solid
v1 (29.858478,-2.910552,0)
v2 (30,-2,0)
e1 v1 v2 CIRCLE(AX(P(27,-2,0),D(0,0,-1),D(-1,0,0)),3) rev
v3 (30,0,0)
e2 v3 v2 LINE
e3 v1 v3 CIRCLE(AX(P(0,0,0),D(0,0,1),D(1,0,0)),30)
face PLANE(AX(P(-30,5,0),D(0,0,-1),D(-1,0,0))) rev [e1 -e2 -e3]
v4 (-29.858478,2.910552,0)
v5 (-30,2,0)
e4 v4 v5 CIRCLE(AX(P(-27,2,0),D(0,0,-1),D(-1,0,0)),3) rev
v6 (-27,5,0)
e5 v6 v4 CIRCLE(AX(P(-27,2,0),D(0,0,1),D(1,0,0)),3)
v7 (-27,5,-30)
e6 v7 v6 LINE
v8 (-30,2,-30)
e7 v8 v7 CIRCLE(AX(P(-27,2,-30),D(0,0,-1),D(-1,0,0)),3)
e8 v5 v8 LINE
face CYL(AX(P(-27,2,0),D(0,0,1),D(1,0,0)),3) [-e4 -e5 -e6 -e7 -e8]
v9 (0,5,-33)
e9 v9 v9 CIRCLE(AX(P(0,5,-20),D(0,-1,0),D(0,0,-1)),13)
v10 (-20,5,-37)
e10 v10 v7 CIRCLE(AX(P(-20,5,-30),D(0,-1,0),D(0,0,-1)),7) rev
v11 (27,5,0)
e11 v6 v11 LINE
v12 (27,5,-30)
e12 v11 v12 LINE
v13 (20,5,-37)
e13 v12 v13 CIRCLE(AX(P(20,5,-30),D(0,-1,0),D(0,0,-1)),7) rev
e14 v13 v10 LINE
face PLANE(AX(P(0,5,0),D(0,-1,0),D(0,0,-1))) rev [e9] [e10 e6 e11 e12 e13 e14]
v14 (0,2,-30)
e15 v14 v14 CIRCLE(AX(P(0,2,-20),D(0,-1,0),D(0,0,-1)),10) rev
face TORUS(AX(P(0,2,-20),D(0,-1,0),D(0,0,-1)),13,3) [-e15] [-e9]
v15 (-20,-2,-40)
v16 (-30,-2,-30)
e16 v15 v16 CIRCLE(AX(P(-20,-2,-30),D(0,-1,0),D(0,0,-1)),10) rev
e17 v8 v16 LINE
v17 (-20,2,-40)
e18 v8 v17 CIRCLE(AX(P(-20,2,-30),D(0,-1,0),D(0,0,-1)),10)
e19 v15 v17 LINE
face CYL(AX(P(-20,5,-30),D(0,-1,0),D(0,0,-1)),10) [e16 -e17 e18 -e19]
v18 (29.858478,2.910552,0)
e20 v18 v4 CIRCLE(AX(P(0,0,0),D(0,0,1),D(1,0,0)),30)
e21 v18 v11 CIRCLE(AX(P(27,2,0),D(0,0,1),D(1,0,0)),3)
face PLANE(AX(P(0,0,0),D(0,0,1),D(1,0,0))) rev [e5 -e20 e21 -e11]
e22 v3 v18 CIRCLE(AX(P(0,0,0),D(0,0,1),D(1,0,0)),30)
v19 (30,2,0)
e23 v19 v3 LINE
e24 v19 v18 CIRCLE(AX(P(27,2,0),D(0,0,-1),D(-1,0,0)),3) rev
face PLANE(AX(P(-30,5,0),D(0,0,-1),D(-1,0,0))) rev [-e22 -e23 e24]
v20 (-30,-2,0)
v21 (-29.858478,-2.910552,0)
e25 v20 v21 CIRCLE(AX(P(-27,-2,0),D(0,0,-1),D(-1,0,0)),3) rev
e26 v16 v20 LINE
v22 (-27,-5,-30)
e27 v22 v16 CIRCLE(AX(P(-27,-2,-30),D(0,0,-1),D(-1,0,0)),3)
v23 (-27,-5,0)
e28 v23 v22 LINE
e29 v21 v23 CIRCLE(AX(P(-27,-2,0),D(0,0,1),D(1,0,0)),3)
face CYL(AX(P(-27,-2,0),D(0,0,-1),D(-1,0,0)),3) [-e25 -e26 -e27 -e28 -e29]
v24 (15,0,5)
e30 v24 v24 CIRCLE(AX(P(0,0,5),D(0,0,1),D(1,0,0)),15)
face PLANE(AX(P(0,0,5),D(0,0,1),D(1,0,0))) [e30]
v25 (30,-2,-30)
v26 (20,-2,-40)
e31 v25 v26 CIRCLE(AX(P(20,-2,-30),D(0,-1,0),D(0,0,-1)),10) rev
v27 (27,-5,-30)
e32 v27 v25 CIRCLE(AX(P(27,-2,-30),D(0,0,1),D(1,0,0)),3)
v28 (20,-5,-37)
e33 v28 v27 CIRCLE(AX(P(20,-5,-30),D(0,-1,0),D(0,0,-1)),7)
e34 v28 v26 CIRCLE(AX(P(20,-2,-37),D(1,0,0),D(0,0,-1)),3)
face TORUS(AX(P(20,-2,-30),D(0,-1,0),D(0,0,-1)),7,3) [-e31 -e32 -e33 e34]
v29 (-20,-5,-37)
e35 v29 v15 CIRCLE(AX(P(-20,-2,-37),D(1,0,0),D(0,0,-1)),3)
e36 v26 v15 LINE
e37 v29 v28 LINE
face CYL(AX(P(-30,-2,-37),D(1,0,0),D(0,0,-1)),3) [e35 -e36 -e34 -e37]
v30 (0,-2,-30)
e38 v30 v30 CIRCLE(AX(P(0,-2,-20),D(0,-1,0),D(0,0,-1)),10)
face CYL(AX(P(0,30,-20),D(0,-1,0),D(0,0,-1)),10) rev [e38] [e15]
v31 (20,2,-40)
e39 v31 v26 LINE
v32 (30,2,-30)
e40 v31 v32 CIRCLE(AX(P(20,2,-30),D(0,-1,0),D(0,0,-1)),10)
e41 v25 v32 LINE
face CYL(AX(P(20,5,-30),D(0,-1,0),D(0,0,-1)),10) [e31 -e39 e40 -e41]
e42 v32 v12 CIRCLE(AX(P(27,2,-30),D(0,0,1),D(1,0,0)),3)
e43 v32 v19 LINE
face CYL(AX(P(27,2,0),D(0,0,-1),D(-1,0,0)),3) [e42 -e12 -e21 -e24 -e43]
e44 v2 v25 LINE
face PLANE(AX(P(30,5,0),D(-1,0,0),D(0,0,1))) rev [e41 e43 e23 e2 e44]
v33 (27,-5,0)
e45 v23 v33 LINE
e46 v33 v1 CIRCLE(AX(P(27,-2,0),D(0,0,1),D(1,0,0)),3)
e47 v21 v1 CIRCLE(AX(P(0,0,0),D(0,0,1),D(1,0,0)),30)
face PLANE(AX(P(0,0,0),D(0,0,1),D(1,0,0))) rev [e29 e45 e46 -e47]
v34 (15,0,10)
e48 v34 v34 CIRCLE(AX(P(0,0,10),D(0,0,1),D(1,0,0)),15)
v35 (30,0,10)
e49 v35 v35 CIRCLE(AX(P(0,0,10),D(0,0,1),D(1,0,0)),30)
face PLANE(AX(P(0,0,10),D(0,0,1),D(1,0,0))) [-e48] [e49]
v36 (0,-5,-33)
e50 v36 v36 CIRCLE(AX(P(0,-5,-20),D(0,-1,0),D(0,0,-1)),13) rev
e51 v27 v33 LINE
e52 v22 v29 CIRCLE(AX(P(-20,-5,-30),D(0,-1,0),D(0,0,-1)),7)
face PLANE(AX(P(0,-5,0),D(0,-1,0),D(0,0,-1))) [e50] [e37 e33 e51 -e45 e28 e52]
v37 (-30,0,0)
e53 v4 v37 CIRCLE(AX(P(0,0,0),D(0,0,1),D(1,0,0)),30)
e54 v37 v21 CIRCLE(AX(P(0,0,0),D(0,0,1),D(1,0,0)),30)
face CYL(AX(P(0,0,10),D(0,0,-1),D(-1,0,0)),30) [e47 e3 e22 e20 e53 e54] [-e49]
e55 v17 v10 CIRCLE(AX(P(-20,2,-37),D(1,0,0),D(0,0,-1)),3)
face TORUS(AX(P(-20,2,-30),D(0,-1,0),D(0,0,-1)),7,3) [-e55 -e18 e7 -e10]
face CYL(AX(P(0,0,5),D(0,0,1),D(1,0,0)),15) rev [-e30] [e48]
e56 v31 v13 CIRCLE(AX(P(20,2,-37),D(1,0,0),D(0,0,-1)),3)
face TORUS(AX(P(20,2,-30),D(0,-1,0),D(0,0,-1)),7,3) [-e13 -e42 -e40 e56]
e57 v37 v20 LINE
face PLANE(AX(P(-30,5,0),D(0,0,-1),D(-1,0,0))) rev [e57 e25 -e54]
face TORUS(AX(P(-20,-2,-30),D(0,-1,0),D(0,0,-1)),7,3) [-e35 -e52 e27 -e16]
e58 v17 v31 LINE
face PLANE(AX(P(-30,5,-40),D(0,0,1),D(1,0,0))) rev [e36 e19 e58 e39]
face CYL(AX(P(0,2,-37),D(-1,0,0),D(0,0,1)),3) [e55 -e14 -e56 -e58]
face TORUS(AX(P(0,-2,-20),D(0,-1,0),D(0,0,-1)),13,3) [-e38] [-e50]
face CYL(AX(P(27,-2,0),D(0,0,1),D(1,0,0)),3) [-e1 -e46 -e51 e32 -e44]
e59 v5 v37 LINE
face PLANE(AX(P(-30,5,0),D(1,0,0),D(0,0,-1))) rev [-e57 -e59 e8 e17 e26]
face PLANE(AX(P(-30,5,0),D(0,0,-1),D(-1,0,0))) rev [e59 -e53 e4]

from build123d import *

# Parameters (mm, degrees)
CROQUIS1_R              = 30
SALIENTE_EXTRUIR1_DEPTH = 10
CROQUIS2_W              = 60
CROQUIS2_H              = 40
SALIENTE_EXTRUIR2_DEPTH = 5
REDONDEO1_R             = 10
REDONDEO2_R             = 3
CROQUIS3_R              = 15
CORTAR_EXTRUIR1_DEPTH   = 5
CROQUIS4_R              = 10
CORTAR_EXTRUIR2_DEPTH   = 62.032778128
REDONDEO3_R             = 3


with BuildPart() as part:
    # Croquis1 → Saliente-Extruir1 (new body)
    with BuildSketch(Plane.XY):
        Circle(CROQUIS1_R)
    extrude(amount=SALIENTE_EXTRUIR1_DEPTH)

    # Croquis2 → Saliente-Extruir2 (add, symmetric)
    with BuildSketch(Plane(origin=(0, 0, 0), x_dir=(1, 0, 0), z_dir=(0, 1, 0))):
        with Locations((0, 20)):
            Rectangle(CROQUIS2_W, CROQUIS2_H)
    extrude(amount=SALIENTE_EXTRUIR2_DEPTH, both=True)

    # Redondeo1
    redondeo1_edges = [part.edges().sort_by_distance(p)[0] for p in [
        (-30, 0, -40),
        (30, 0, -40),
    ]]
    fillet(redondeo1_edges, radius=REDONDEO1_R)

    # Redondeo2
    # the kernel refuses this fillet: 3 mm, written as the material it takes off along each edge
    with BuildSketch(Plane(origin=(30, -5, 0), x_dir=(0, 1, 0), z_dir=(0, 0, -1)), Plane(origin=(30, 5, 0), x_dir=(-1, 0, 0), z_dir=(0, 0, -1)), Plane(origin=(-30, -5, -30), x_dir=(0, 1, 0), z_dir=(0, 0, 1)), Plane(origin=(-30, 5, -30), x_dir=(1, 0, 0), z_dir=(0, 0, 1))) as redondeo2_piece_1:
        with BuildLine():
            CenterArc((REDONDEO2_R, -REDONDEO2_R), REDONDEO2_R, 90, 90)
            Line((0, -REDONDEO2_R), (0, 0))
            Line((0, 0), (REDONDEO2_R, 0))
        make_face()
    extrude(amount=30, mode=Mode.SUBTRACT)
    with BuildSketch(Plane(origin=(20, -5, -40), x_dir=(0, 1, 0), z_dir=(-1, 0, 0)), Plane(origin=(20, 5, -40), x_dir=(0, 0, 1), z_dir=(-1, 0, 0))) as redondeo2_piece_2:
        with BuildLine():
            CenterArc((REDONDEO2_R, -REDONDEO2_R), REDONDEO2_R, 90, 90)
            Line((0, -REDONDEO2_R), (0, 0))
            Line((0, 0), (REDONDEO2_R, 0))
        make_face()
    extrude(amount=40, mode=Mode.SUBTRACT)
    with BuildSketch(Plane(origin=(-20, -5, -30), x_dir=(-1, 0, 0), z_dir=(0, 0, 1))) as redondeo2_piece_3:
        with BuildLine():
            CenterArc((10 - REDONDEO2_R, -REDONDEO2_R), REDONDEO2_R, 0, 90)
            Line((10 - REDONDEO2_R, 0), (10, 0))
            Line((10, 0), (10, -REDONDEO2_R))
        make_face()
    revolve(axis=Axis((-20, -5, -30), (0, -1, 0)), revolution_arc=90, mode=Mode.SUBTRACT)
    with BuildSketch(Plane(origin=(20, -5, -30), x_dir=(1, 0, 0), z_dir=(0, 0, 1))) as redondeo2_piece_4:
        with BuildLine():
            CenterArc((10 - REDONDEO2_R, REDONDEO2_R), REDONDEO2_R, 270, 90)
            Line((10 - REDONDEO2_R, 0), (10, 0))
            Line((10, 0), (10, REDONDEO2_R))
        make_face()
    revolve(axis=Axis((20, -5, -30), (0, 1, 0)), revolution_arc=90, mode=Mode.SUBTRACT)
    with BuildSketch(Plane(origin=(-20, 5, -30), x_dir=(-1, 0, 0), z_dir=(0, 0, 1))) as redondeo2_piece_5:
        with BuildLine():
            CenterArc((10 - REDONDEO2_R, REDONDEO2_R), REDONDEO2_R, 270, 90)
            Line((10, REDONDEO2_R), (10, 0))
            Line((10, 0), (10 - REDONDEO2_R, 0))
        make_face()
    revolve(axis=Axis((-20, 5, -30), (0, -1, 0)), revolution_arc=90, mode=Mode.SUBTRACT)
    with BuildSketch(Plane(origin=(20, 5, -30), x_dir=(1, 0, 0), z_dir=(0, 0, 1))) as redondeo2_piece_6:
        with BuildLine():
            CenterArc((10 - REDONDEO2_R, -REDONDEO2_R), REDONDEO2_R, 0, 90)
            Line((10, -REDONDEO2_R), (10, 0))
            Line((10, 0), (10 - REDONDEO2_R, 0))
        make_face()
    revolve(axis=Axis((20, 5, -30), (0, 1, 0)), revolution_arc=90, mode=Mode.SUBTRACT)

    # Croquis3 → Cortar-Extruir1 (cut)
    with BuildSketch(Plane.XY.offset(10)):
        Circle(CROQUIS3_R)
    extrude(amount=-CORTAR_EXTRUIR1_DEPTH, mode=Mode.SUBTRACT)

    # Croquis4 → Cortar-Extruir2 (cut, through all)
    with BuildSketch(Plane.XZ.offset(5)):
        with Locations(Location((0, -20, 0), (0, 0, 270))):
            Circle(CROQUIS4_R)
    extrude(amount=-CORTAR_EXTRUIR2_DEPTH, mode=Mode.SUBTRACT)

    # Redondeo3
    redondeo3_edges = [part.edges().sort_by_distance(p)[0] for p in [
        (0, 5, -10),
        (0, -5, -10),
    ]]
    fillet(redondeo3_edges, radius=REDONDEO3_R)


solid = part.part
